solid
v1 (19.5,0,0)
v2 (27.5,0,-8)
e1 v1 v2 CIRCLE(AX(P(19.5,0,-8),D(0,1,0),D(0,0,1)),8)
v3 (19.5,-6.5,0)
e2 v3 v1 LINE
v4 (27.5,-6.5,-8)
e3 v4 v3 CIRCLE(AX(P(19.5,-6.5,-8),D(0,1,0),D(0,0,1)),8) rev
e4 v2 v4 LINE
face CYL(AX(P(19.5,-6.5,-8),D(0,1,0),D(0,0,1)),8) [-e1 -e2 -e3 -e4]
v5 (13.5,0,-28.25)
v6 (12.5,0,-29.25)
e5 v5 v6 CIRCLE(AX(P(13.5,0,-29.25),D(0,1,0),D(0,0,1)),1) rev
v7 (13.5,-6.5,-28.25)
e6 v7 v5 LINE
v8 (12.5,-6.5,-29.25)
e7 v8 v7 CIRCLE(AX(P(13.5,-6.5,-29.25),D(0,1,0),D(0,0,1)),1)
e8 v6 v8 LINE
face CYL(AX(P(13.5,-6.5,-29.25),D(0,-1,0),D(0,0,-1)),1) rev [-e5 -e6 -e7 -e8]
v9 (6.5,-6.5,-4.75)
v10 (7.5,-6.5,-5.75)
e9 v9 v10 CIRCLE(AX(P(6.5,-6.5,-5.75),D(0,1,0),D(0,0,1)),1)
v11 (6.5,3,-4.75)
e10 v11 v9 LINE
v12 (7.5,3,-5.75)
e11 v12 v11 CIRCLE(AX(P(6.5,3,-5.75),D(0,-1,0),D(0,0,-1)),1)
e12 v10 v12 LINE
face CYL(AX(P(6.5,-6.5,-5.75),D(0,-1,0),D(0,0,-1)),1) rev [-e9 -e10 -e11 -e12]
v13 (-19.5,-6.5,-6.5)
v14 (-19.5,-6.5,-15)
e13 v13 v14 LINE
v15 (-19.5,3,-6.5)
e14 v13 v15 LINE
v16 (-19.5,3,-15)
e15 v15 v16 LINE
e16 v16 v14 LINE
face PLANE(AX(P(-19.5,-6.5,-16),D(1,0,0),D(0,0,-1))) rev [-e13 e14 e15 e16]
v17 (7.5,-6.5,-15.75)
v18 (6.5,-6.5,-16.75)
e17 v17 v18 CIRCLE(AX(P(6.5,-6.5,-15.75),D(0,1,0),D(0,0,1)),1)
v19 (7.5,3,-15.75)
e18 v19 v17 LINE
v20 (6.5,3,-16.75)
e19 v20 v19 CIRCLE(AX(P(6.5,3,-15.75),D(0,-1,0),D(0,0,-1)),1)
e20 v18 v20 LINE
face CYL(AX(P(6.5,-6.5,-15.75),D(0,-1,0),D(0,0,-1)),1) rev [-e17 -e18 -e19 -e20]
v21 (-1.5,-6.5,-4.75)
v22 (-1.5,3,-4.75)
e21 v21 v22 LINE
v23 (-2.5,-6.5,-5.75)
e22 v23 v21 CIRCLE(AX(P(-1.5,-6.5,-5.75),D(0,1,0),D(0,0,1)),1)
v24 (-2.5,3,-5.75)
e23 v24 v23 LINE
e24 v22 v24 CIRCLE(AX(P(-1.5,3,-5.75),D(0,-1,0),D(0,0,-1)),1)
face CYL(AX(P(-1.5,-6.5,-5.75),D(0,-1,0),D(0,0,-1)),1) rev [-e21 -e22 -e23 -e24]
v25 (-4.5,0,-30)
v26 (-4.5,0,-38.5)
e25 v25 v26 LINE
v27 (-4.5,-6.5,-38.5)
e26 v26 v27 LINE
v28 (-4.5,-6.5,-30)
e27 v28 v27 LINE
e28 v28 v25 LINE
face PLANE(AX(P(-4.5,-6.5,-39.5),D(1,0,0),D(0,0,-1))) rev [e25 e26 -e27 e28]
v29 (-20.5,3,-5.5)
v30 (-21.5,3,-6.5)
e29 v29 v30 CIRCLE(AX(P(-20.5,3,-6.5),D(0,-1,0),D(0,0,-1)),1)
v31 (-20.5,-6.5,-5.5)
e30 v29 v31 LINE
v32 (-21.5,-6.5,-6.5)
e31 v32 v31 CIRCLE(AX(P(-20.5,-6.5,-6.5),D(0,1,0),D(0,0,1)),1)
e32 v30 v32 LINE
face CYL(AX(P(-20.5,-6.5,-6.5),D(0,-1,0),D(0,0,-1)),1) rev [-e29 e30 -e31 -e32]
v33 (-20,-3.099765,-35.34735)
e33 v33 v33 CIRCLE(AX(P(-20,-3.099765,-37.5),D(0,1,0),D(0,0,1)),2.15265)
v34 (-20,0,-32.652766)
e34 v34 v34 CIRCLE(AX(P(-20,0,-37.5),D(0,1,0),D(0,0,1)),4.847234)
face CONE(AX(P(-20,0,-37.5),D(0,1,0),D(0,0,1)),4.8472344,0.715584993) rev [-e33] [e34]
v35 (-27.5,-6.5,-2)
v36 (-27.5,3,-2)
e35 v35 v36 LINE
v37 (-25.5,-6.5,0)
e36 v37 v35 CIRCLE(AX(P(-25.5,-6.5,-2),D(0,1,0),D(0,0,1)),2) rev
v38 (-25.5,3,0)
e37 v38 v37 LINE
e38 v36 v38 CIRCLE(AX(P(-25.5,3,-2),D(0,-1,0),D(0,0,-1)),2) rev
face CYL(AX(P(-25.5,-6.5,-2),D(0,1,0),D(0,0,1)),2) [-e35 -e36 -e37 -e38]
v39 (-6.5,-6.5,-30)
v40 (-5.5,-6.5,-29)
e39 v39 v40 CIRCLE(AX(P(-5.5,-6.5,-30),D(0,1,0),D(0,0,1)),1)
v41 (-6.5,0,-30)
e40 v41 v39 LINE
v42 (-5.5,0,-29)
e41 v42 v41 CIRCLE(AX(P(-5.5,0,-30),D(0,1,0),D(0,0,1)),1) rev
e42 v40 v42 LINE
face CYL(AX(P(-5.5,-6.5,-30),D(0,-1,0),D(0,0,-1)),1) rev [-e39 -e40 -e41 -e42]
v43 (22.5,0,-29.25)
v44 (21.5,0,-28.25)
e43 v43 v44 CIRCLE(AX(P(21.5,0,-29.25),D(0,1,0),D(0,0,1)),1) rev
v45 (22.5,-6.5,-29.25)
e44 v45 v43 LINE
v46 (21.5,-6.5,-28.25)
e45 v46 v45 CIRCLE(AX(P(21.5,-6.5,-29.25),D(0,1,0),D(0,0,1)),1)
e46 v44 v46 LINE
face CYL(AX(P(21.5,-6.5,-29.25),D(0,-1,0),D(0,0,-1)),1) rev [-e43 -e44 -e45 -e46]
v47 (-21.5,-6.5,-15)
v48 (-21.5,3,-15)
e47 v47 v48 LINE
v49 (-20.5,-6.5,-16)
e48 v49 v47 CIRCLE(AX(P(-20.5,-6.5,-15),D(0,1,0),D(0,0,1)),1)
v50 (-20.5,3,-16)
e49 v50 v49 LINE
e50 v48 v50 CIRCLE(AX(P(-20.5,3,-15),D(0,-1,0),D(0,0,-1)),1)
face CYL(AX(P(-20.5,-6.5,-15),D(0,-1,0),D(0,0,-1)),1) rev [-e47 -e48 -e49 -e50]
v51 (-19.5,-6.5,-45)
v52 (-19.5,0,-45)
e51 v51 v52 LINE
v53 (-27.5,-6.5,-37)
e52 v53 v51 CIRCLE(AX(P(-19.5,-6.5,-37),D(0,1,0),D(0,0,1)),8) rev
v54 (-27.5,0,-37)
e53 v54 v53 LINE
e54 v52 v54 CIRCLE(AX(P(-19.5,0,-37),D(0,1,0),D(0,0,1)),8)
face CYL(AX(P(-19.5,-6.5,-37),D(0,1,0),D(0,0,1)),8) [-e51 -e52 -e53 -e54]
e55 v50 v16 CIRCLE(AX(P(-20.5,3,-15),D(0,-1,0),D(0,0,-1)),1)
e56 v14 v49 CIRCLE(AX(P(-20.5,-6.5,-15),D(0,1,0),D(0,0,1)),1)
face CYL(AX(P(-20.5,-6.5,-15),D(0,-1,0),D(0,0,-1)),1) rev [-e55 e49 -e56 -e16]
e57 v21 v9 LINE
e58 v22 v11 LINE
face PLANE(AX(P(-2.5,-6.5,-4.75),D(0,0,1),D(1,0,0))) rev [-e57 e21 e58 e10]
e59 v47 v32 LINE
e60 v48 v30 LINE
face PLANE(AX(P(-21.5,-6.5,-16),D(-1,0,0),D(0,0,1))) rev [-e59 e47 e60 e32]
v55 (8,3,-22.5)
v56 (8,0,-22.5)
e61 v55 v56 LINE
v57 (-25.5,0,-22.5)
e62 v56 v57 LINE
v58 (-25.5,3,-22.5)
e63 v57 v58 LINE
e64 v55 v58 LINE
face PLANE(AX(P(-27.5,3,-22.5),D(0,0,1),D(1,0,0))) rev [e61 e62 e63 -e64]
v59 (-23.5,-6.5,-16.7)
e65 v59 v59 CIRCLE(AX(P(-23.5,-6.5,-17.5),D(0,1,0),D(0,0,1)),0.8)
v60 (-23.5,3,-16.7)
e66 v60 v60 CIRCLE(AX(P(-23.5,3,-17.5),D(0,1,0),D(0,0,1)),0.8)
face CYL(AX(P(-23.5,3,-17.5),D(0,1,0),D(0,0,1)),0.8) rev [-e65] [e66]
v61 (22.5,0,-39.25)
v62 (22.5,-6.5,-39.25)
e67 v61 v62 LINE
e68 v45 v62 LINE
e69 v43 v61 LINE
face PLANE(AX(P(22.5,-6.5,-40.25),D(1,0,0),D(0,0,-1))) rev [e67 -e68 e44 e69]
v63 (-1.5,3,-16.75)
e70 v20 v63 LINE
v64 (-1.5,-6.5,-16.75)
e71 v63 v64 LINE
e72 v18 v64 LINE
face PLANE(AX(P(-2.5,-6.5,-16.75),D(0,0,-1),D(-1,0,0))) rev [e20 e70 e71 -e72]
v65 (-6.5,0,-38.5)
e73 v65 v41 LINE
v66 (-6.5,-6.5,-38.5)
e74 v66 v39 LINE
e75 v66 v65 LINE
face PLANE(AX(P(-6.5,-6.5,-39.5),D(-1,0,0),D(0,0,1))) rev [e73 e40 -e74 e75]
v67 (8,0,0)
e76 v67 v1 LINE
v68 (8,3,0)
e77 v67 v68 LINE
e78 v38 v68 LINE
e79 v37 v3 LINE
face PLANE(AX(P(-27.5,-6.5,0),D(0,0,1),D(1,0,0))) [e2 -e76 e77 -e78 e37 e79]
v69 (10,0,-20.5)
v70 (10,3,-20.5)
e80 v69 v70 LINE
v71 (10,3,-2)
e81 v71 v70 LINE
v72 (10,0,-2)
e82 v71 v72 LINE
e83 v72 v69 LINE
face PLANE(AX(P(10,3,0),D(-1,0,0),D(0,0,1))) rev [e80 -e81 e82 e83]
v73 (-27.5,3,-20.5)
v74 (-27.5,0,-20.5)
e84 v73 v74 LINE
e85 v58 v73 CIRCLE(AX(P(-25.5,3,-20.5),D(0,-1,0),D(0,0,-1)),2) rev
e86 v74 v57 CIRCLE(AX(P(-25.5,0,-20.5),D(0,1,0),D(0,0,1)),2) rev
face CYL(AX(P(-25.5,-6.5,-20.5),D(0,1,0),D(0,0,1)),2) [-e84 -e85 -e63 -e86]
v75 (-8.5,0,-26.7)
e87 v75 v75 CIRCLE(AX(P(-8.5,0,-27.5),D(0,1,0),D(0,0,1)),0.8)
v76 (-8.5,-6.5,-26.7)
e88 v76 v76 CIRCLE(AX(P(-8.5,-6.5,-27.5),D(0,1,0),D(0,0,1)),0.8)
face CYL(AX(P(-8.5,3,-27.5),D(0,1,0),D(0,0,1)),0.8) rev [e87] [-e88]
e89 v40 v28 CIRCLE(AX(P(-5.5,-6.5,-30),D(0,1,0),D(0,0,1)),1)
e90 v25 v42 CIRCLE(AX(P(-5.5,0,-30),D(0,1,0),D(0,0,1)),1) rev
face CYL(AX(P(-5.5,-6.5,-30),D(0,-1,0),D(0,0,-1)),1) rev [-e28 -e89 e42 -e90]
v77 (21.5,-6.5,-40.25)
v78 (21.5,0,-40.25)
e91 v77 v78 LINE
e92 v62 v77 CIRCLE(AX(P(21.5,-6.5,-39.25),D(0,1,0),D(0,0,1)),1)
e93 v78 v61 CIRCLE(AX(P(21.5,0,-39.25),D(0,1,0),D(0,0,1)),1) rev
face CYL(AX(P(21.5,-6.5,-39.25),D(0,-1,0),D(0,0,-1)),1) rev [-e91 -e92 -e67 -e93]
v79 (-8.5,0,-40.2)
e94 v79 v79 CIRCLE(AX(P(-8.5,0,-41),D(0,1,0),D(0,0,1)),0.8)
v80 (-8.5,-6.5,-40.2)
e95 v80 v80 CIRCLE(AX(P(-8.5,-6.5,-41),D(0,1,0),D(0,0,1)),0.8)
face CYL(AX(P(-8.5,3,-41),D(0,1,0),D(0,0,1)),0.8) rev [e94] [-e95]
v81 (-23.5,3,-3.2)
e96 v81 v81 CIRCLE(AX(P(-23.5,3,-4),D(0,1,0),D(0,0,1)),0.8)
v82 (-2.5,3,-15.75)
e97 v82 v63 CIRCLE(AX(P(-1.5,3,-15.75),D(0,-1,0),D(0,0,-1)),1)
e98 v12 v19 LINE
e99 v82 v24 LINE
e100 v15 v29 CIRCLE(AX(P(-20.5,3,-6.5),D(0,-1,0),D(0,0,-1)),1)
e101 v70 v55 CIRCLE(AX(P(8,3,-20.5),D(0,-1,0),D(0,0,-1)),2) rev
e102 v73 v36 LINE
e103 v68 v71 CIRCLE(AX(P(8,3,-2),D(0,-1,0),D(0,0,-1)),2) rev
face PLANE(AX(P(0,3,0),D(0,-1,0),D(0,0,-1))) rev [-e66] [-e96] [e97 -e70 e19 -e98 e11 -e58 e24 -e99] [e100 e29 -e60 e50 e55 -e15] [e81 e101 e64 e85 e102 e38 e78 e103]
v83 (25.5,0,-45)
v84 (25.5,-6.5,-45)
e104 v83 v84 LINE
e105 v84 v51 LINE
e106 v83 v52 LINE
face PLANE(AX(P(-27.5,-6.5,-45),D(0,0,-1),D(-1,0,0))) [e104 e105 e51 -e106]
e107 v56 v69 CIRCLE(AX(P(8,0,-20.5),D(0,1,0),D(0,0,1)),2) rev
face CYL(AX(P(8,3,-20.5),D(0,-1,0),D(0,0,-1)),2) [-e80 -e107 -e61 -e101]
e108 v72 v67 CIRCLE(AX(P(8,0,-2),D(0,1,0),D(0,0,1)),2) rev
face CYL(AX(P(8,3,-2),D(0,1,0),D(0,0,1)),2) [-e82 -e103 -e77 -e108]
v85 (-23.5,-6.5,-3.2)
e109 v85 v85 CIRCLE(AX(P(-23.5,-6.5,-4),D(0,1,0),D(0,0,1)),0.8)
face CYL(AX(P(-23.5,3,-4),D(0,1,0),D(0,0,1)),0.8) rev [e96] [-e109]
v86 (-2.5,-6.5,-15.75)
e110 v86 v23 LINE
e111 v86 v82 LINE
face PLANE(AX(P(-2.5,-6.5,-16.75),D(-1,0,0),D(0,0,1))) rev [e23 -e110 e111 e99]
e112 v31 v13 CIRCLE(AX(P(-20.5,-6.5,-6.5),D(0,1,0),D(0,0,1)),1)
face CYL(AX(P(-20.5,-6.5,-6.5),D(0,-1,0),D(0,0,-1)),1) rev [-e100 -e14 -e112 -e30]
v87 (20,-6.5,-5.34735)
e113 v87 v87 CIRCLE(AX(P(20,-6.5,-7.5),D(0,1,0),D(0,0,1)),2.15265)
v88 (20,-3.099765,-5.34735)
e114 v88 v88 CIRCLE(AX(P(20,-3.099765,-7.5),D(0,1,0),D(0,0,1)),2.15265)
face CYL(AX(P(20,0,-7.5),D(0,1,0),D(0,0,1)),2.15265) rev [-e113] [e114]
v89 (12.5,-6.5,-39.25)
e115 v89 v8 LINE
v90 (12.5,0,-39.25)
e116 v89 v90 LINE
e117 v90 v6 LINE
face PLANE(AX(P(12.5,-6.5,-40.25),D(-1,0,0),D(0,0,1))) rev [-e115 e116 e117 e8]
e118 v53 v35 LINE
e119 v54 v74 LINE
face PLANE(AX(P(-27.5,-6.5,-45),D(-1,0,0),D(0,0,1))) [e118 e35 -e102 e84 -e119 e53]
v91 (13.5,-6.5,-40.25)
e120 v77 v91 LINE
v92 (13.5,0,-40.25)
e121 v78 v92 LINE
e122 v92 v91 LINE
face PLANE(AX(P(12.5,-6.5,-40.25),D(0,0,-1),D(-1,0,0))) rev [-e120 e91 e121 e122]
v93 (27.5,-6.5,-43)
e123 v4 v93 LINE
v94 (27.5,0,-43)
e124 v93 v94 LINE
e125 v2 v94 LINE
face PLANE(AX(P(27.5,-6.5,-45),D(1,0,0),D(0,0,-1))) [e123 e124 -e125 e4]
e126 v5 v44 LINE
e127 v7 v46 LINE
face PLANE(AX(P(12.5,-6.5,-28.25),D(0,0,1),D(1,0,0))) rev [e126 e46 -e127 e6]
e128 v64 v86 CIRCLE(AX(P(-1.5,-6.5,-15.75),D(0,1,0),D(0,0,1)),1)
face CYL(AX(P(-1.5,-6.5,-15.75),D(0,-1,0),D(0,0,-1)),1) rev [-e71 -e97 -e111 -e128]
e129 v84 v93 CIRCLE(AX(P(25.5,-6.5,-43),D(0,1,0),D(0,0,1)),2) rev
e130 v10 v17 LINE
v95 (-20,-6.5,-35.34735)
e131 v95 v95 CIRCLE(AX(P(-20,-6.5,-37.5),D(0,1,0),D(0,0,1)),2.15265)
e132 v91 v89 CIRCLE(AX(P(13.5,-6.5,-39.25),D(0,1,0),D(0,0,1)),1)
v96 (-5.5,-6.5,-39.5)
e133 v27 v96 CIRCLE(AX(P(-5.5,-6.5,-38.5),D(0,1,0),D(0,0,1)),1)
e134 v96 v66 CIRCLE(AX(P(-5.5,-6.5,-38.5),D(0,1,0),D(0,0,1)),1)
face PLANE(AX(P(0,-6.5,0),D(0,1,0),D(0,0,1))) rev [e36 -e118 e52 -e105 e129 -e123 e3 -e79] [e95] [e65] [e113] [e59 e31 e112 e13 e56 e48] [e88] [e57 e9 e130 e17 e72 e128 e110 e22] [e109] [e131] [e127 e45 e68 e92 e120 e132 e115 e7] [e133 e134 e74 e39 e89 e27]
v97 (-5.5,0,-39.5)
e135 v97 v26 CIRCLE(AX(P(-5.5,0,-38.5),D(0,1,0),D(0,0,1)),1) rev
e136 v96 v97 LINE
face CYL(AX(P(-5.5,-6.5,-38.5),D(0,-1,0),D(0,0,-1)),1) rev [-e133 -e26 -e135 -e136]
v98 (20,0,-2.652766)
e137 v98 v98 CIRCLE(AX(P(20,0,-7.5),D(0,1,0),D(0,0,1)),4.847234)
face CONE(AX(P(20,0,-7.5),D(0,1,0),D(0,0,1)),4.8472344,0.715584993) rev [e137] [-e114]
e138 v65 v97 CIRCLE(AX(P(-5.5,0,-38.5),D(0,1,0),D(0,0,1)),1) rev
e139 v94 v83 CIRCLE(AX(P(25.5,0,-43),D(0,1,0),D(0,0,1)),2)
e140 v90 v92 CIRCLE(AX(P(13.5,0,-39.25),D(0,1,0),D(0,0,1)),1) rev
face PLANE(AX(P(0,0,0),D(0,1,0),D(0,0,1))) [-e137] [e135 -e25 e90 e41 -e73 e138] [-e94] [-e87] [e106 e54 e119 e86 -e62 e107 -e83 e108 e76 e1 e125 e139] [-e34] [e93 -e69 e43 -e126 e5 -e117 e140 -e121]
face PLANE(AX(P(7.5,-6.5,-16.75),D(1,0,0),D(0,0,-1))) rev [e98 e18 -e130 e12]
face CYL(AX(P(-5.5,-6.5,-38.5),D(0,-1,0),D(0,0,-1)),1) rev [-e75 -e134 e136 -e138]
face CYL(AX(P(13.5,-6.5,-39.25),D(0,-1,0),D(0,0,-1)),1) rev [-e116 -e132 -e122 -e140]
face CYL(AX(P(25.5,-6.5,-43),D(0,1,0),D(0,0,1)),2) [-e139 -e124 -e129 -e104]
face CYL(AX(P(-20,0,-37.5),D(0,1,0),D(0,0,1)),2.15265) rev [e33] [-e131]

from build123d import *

# Parameters (mm, degrees)
BASE_SKETCH_W                       = 55
BASE_SKETCH_H                       = 45
BASE_EXTRUDE_DEPTH                  = 6.5
RAISED_SECTION_SKETCH_W             = 37.5
RAISED_SECTION_SKETCH_H             = 22.5
RAISED_SECTION_EXTRUDE_DEPTH        = 3
MOSFET_MOUNTING_HOLES_D             = 1.6
MOUNTING_HOLES_D                    = 4.3053
MOUNTING_HOLES_CSINK_D              = 9.6944688
MOUNTING_HOLES_CSINK_ANGLE          = 82
CUT_PIN_RELIEF_DEPTH                = 54.136616377
CUT_PIN_RELIEF_DEPTH_BACK           = 54.136616377
PIN_SKETCH_W                        = 10
PIN_SKETCH_H                        = 12
PIN_SKETCH_W_2                      = 2
PIN_SKETCH_H_2                      = 10.5
LARGE_OUTSIDE_CORNER_FILLETS_R      = 8
SMALL_OUTSIDE_CORNER_FILLETS_R      = 2
SCREW_TERMINAL_CUTOUT_FILLETS_R     = 1
HEADER_PINS_CUTOUT_RELIEF_FILLETS_R = 1


with BuildPart() as part:
    # Base Sketch → Base Extrude (new body)
    with BuildSketch(Plane(origin=(0, 0, 0), x_dir=(1, 0, 0), z_dir=(0, 1, 0))):
        with Locations((0, 22.5)):
            Rectangle(BASE_SKETCH_W, BASE_SKETCH_H)
    extrude(amount=-BASE_EXTRUDE_DEPTH)

    # Raised Section Sketch → Raised Section Extrude (add)
    with BuildSketch(Plane(origin=(0, 0, 0), x_dir=(1, 0, 0), z_dir=(0, 1, 0))):
        with Locations((-8.75, 11.25)):
            Rectangle(RAISED_SECTION_SKETCH_W, RAISED_SECTION_SKETCH_H)
    extrude(amount=RAISED_SECTION_EXTRUDE_DEPTH)

    # Mosfet Mounting Holes (through all)
    with Locations(Plane(origin=(0, 3, 0), x_dir=(1, 0, 0), z_dir=(0, 1, 0))):
        with Locations((-23.5, 4), (-23.5, 17.5), (-8.5, 27.5), (-8.5, 41)):
            Hole(MOSFET_MOUNTING_HOLES_D / 2)

    # Mounting Holes (through all)
    with Locations(Plane(origin=(0, 0, 0), x_dir=(1, 0, 0), z_dir=(0, 1, 0))):
        with Locations((-20, 37.5), (20, 7.5)):
            CounterSinkHole(MOUNTING_HOLES_D / 2, MOUNTING_HOLES_CSINK_D / 2, counter_sink_angle=MOUNTING_HOLES_CSINK_ANGLE)

    # Pin Sketch → Cut Pin Relief (cut, two sides: drawn at the far end of the back side and taken through both)
    with BuildSketch(Plane(origin=(0, 0, 0), x_dir=(1, 0, 0), z_dir=(0, 1, 0)).offset(-CUT_PIN_RELIEF_DEPTH_BACK)):
        with Locations((2.5, 10.75)):
            Rectangle(PIN_SKETCH_W, PIN_SKETCH_H)
        with Locations((17.5, 34.25)):
            Rectangle(PIN_SKETCH_W, PIN_SKETCH_H)
        with Locations((-20.5, 10.75)):
            Rectangle(PIN_SKETCH_W_2, PIN_SKETCH_H_2)
        with Locations((-5.5, 34.25)):
            Rectangle(PIN_SKETCH_W_2, PIN_SKETCH_H_2)
    extrude(amount=CUT_PIN_RELIEF_DEPTH + CUT_PIN_RELIEF_DEPTH_BACK, mode=Mode.SUBTRACT)

    # Large Outside Corner Fillets
    large_outside_corner_fillets_edges = [part.edges().sort_by_distance(p)[0] for p in [
        (-27.5, -3.25, -45),
        (27.5, -3.25, 0),
    ]]
    fillet(large_outside_corner_fillets_edges, radius=LARGE_OUTSIDE_CORNER_FILLETS_R)

    # Small Outside Corner Fillets
    small_outside_corner_fillets_edges = [part.edges().sort_by_distance(p)[0] for p in [
        (-27.5, 1.5, -22.5),
        (10, 1.5, 0),
        (10, 1.5, -22.5),
        (27.5, -3.25, -45),
        (-27.5, -1.75, 0),
    ]]
    fillet(small_outside_corner_fillets_edges, radius=SMALL_OUTSIDE_CORNER_FILLETS_R)

    # Screw Terminal Cutout Fillets
    screw_terminal_cutout_fillets_edges = [part.edges().sort_by_distance(p)[0] for p in [
        (-2.5, -1.75, -4.75),
        (-2.5, -1.75, -16.75),
        (7.5, -1.75, -16.75),
        (7.5, -1.75, -4.75),
        (12.5, -3.25, -28.25),
        (12.5, -3.25, -40.25),
        (22.5, -3.25, -40.25),
        (22.5, -3.25, -28.25),
    ]]
    fillet(screw_terminal_cutout_fillets_edges, radius=SCREW_TERMINAL_CUTOUT_FILLETS_R)

    # Header Pins Cutout Relief Fillets
    header_pins_cutout_relief_fillets_edges = [part.edges().sort_by_distance(p)[0] for p in [
        (-4.5, -3.25, -29),
        (-6.5, -3.25, -29),
        (-6.5, -3.25, -39.5),
        (-4.5, -3.25, -39.5),
        (-19.5, -1.75, -16),
        (-21.5, -1.75, -16),
        (-21.5, -1.75, -5.5),
        (-19.5, -1.75, -5.5),
    ]]
    fillet(header_pins_cutout_relief_fillets_edges, radius=HEADER_PINS_CUTOUT_RELIEF_FILLETS_R - 0.0001)  # a hair under: the kernel refuses the full size


solid = part.part
